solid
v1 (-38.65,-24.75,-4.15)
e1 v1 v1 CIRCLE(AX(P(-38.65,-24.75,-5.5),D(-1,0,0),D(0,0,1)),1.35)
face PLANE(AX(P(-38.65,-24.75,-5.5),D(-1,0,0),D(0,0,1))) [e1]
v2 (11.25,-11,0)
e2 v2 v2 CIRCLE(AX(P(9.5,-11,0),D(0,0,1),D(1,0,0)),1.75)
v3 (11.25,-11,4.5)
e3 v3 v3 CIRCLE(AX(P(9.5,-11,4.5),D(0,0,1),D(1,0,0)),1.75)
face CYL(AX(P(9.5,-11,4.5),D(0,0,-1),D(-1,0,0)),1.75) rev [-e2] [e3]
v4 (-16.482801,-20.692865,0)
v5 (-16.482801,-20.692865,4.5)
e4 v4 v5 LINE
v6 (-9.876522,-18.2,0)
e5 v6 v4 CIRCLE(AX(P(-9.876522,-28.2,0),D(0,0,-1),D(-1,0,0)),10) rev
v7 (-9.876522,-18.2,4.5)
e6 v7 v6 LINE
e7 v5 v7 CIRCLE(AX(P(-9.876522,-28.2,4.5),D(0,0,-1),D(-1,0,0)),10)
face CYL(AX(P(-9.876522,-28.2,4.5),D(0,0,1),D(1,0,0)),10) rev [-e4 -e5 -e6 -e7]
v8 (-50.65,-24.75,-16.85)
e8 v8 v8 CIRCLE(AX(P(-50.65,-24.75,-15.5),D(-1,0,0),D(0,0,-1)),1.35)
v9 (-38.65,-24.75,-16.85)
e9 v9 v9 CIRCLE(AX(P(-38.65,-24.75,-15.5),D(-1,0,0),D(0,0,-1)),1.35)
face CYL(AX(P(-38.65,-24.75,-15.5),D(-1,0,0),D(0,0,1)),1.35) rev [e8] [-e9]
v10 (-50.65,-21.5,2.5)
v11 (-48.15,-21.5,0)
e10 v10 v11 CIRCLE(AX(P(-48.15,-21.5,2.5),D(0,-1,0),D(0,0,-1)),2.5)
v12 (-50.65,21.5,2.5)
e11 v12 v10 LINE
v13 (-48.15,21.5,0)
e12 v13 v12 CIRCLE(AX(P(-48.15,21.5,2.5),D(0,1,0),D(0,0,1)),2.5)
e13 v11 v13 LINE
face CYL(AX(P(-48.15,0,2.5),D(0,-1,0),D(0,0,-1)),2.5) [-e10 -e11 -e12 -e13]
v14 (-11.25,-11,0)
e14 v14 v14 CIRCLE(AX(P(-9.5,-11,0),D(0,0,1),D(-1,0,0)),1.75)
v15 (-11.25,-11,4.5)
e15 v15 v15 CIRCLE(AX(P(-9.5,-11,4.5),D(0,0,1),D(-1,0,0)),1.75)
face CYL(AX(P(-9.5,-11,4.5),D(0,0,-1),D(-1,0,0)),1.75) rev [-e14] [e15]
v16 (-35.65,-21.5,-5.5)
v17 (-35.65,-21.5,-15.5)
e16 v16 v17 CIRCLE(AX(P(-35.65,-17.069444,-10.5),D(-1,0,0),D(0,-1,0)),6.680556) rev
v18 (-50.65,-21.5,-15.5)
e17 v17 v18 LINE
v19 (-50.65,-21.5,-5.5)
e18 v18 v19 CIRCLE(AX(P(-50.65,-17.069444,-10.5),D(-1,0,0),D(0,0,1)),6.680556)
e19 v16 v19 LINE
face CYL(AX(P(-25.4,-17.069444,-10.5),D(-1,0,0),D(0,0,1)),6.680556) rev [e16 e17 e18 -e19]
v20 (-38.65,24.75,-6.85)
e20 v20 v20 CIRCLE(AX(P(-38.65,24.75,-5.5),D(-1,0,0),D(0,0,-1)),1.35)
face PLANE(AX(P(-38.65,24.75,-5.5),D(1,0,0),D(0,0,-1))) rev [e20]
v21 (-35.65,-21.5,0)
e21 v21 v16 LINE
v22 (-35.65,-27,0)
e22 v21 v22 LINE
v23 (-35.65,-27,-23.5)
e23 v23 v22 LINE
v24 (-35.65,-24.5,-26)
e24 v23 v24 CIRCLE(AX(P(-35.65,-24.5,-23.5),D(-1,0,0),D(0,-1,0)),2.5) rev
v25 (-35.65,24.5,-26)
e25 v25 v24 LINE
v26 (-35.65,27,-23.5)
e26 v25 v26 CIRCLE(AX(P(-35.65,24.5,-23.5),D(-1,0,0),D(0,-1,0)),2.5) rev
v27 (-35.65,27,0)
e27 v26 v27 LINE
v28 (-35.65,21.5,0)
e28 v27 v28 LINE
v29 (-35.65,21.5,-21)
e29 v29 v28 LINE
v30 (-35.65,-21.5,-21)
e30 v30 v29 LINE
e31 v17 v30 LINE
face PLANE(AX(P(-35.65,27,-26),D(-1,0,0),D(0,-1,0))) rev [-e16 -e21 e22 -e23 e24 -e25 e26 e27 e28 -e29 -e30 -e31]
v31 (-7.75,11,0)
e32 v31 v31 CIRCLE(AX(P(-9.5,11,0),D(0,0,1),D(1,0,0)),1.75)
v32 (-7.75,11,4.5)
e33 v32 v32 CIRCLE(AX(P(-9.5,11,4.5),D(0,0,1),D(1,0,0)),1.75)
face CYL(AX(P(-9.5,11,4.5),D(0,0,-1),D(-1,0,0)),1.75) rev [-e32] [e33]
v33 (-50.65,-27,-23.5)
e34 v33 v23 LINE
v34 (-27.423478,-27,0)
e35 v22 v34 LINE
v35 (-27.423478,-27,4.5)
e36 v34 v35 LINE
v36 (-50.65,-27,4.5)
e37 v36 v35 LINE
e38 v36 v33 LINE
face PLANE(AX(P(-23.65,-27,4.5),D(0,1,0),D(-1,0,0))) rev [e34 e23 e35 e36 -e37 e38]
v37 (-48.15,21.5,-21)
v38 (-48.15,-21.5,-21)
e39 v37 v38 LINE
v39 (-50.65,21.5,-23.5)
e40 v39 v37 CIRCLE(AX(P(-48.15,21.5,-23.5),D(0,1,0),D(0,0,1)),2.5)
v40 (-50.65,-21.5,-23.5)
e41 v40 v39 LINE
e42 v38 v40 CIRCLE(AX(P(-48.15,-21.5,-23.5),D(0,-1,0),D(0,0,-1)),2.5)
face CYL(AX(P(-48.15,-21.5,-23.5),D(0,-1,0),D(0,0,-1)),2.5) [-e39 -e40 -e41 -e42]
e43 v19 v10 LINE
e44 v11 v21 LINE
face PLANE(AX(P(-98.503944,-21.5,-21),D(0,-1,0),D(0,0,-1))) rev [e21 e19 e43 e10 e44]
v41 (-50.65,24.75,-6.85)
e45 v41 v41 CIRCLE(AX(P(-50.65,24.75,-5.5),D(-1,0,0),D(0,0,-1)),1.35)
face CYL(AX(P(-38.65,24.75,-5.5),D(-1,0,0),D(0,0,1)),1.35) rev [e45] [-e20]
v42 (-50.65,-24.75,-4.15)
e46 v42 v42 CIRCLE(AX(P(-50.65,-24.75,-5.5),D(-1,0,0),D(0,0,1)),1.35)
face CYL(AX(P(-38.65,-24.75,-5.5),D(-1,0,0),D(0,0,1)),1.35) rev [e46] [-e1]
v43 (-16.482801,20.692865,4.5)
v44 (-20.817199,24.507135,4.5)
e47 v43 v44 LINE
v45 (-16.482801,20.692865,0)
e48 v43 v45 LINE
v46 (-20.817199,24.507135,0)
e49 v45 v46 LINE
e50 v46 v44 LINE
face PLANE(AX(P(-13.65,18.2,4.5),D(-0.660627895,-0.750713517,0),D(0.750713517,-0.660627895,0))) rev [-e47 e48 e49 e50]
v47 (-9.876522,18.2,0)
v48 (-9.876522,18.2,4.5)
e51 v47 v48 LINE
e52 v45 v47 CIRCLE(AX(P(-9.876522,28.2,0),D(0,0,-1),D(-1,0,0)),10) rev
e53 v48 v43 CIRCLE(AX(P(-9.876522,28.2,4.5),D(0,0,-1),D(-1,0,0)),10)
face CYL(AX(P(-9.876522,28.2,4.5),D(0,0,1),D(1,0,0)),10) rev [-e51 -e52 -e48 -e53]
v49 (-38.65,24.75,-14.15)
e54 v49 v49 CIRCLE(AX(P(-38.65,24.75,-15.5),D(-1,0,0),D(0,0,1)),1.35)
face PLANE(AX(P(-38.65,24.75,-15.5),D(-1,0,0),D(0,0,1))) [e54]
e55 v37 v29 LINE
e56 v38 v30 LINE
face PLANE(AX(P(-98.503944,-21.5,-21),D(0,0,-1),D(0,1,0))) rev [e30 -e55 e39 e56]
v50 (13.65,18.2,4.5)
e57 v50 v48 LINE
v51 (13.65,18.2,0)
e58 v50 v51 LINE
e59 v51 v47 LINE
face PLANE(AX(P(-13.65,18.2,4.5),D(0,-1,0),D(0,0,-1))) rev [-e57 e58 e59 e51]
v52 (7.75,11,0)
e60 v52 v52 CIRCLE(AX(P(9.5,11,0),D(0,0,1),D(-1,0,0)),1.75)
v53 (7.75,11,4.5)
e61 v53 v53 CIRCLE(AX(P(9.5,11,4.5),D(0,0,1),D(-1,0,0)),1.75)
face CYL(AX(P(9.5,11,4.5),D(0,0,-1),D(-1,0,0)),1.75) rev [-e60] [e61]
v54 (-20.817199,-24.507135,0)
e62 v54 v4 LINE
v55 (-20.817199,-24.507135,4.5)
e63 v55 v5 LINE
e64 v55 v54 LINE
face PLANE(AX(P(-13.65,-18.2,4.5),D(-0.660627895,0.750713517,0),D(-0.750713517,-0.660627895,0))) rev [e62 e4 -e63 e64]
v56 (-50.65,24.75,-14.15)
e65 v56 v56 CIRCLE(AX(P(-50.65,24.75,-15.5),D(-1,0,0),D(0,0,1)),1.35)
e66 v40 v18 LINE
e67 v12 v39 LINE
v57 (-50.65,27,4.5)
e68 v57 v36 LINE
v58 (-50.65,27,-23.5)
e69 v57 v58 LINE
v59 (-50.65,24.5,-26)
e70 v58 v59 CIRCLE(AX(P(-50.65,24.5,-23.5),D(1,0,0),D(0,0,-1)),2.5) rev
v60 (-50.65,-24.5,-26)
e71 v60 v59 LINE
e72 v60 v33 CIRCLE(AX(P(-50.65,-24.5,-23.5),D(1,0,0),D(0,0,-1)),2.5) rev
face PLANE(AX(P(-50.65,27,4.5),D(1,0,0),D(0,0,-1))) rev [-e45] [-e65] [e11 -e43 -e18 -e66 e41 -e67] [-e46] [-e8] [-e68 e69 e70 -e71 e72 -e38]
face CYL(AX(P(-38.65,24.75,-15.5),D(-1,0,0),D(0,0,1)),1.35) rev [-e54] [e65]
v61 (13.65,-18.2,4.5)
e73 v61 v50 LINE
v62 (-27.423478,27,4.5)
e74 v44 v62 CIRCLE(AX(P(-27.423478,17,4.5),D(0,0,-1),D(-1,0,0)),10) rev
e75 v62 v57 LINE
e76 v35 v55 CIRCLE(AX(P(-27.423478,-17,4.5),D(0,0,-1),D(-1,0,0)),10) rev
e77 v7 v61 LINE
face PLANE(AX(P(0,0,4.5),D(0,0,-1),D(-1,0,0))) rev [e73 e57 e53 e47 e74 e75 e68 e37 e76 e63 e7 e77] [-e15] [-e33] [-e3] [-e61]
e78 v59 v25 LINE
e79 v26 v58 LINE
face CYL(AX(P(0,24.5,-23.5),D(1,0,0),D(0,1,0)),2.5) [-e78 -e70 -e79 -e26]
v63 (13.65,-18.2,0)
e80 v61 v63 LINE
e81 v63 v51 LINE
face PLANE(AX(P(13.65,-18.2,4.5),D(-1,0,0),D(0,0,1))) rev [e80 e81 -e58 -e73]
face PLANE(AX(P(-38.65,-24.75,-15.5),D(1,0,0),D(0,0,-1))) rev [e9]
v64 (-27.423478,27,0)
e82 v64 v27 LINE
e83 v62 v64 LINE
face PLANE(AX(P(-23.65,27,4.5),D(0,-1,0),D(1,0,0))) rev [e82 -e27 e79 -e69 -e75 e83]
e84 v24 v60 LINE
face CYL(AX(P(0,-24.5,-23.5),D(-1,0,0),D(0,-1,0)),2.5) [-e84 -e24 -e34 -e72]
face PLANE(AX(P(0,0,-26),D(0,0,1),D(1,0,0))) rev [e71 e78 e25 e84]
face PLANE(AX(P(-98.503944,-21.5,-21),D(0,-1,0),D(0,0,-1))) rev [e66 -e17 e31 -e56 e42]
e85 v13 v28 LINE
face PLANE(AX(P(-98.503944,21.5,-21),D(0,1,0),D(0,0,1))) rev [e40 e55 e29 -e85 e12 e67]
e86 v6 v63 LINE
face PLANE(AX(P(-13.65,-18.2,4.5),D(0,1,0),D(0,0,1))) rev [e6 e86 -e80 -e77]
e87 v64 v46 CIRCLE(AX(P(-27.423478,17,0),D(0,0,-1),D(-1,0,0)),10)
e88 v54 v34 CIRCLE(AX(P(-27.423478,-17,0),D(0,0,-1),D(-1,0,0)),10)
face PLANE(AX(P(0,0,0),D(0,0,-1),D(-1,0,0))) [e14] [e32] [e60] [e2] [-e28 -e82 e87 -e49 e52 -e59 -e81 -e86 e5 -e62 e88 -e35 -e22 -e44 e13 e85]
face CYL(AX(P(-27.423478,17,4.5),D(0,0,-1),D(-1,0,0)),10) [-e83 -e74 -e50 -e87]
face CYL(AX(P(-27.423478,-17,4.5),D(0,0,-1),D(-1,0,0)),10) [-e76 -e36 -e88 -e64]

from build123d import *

# Parameters (mm, degrees)
SKETCH1_R           = 1.75
BOSS_EXTRUDE1_DEPTH = 4.5
SKETCH2_W           = 15
SKETCH2_H           = 54
BOSS_EXTRUDE2_DEPTH = 26
SKETCH5_W           = 21
SKETCH5_H           = 43
CUT_EXTRUDE1_DEPTH  = 15
SKETCH6_R           = 1.35
CUT_EXTRUDE2_DEPTH  = 12
CUT_EXTRUDE3_DEPTH  = 15
FILLET1_R           = 10
FILLET3_R           = 2.5


with BuildPart() as part:
    # Sketch1 → Boss-Extrude1 (new body)
    with BuildSketch(Plane.XY):
        Polygon((-13.65, -18.2), (13.65, -18.2), (13.65, 18.2), (-13.65, 18.2), (-23.65, 27), (-50.65, 27), (-50.65, -27), (-23.65, -27), align=None)
        with Locations((-9.5, 11)):
            Circle(SKETCH1_R, mode=Mode.SUBTRACT)
        with Locations(Location((9.5, 11, 0), (0, 0, 180))):
            Circle(SKETCH1_R, mode=Mode.SUBTRACT)
        with Locations(Location((-9.5, -11, 0), (0, 0, 180))):
            Circle(SKETCH1_R, mode=Mode.SUBTRACT)
        with Locations((9.5, -11)):
            Circle(SKETCH1_R, mode=Mode.SUBTRACT)
    extrude(amount=BOSS_EXTRUDE1_DEPTH)

    # Sketch2 → Boss-Extrude2 (add)
    with BuildSketch(Plane(origin=(0, 0, 0), x_dir=(-1, 0, 0), z_dir=(0, 0, -1))):
        with Locations((43.15, 0)):
            Rectangle(SKETCH2_W, SKETCH2_H)
    extrude(amount=BOSS_EXTRUDE2_DEPTH)

    # Sketch5 → Cut-Extrude1 (cut)
    with BuildSketch(Plane(origin=(-35.65, 0, 0), x_dir=(0, 0, -1), z_dir=(1, 0, 0))):
        with Locations((10.5, 0)):
            Rectangle(SKETCH5_W, SKETCH5_H)
    extrude(amount=-CUT_EXTRUDE1_DEPTH, mode=Mode.SUBTRACT)

    # Sketch6 → Cut-Extrude2 (cut)
    with BuildSketch(Plane.ZY.offset(50.65)):
        with Locations((-15.5, 24.75)):
            Circle(SKETCH6_R)
        with Locations(Location((-5.5, 24.75, 0), (0, 0, 180))):
            Circle(SKETCH6_R)
        with Locations((-5.5, -24.75)):
            Circle(SKETCH6_R)
        with Locations(Location((-15.5, -24.75, 0), (0, 0, 180))):
            Circle(SKETCH6_R)
    extrude(amount=-CUT_EXTRUDE2_DEPTH, mode=Mode.SUBTRACT)

    # Sketch8 → Cut-Extrude3 (cut)
    with BuildSketch(Plane.ZY.offset(50.65)):
        with BuildLine():
            Line((-15.5, -21.5), (-5.5, -21.5))
            ThreePointArc((-5.5, -21.5), (-10.5, -23.75), (-15.5, -21.5))
        make_face()
    extrude(amount=-CUT_EXTRUDE3_DEPTH, mode=Mode.SUBTRACT)

    # Fillet1
    fillet1_edges = [part.edges().sort_by_distance(p)[0] for p in [
        (-13.65, -18.2, 2.25),
        (-23.65, -27, 2.25),
        (-23.65, 27, 2.25),
        (-13.65, 18.2, 2.25),
    ]]
    fillet(fillet1_edges, radius=FILLET1_R)

    # Fillet3
    fillet3_edges = [part.edges().sort_by_distance(p)[0] for p in [
        (-43.15, 27, -26),
        (-43.15, -27, -26),
        (-50.65, 0, 0),
        (-50.65, 0, -21),
    ]]
    fillet(fillet3_edges, radius=FILLET3_R - 0.0001)  # a hair under: the kernel refuses the full size


solid = part.part
